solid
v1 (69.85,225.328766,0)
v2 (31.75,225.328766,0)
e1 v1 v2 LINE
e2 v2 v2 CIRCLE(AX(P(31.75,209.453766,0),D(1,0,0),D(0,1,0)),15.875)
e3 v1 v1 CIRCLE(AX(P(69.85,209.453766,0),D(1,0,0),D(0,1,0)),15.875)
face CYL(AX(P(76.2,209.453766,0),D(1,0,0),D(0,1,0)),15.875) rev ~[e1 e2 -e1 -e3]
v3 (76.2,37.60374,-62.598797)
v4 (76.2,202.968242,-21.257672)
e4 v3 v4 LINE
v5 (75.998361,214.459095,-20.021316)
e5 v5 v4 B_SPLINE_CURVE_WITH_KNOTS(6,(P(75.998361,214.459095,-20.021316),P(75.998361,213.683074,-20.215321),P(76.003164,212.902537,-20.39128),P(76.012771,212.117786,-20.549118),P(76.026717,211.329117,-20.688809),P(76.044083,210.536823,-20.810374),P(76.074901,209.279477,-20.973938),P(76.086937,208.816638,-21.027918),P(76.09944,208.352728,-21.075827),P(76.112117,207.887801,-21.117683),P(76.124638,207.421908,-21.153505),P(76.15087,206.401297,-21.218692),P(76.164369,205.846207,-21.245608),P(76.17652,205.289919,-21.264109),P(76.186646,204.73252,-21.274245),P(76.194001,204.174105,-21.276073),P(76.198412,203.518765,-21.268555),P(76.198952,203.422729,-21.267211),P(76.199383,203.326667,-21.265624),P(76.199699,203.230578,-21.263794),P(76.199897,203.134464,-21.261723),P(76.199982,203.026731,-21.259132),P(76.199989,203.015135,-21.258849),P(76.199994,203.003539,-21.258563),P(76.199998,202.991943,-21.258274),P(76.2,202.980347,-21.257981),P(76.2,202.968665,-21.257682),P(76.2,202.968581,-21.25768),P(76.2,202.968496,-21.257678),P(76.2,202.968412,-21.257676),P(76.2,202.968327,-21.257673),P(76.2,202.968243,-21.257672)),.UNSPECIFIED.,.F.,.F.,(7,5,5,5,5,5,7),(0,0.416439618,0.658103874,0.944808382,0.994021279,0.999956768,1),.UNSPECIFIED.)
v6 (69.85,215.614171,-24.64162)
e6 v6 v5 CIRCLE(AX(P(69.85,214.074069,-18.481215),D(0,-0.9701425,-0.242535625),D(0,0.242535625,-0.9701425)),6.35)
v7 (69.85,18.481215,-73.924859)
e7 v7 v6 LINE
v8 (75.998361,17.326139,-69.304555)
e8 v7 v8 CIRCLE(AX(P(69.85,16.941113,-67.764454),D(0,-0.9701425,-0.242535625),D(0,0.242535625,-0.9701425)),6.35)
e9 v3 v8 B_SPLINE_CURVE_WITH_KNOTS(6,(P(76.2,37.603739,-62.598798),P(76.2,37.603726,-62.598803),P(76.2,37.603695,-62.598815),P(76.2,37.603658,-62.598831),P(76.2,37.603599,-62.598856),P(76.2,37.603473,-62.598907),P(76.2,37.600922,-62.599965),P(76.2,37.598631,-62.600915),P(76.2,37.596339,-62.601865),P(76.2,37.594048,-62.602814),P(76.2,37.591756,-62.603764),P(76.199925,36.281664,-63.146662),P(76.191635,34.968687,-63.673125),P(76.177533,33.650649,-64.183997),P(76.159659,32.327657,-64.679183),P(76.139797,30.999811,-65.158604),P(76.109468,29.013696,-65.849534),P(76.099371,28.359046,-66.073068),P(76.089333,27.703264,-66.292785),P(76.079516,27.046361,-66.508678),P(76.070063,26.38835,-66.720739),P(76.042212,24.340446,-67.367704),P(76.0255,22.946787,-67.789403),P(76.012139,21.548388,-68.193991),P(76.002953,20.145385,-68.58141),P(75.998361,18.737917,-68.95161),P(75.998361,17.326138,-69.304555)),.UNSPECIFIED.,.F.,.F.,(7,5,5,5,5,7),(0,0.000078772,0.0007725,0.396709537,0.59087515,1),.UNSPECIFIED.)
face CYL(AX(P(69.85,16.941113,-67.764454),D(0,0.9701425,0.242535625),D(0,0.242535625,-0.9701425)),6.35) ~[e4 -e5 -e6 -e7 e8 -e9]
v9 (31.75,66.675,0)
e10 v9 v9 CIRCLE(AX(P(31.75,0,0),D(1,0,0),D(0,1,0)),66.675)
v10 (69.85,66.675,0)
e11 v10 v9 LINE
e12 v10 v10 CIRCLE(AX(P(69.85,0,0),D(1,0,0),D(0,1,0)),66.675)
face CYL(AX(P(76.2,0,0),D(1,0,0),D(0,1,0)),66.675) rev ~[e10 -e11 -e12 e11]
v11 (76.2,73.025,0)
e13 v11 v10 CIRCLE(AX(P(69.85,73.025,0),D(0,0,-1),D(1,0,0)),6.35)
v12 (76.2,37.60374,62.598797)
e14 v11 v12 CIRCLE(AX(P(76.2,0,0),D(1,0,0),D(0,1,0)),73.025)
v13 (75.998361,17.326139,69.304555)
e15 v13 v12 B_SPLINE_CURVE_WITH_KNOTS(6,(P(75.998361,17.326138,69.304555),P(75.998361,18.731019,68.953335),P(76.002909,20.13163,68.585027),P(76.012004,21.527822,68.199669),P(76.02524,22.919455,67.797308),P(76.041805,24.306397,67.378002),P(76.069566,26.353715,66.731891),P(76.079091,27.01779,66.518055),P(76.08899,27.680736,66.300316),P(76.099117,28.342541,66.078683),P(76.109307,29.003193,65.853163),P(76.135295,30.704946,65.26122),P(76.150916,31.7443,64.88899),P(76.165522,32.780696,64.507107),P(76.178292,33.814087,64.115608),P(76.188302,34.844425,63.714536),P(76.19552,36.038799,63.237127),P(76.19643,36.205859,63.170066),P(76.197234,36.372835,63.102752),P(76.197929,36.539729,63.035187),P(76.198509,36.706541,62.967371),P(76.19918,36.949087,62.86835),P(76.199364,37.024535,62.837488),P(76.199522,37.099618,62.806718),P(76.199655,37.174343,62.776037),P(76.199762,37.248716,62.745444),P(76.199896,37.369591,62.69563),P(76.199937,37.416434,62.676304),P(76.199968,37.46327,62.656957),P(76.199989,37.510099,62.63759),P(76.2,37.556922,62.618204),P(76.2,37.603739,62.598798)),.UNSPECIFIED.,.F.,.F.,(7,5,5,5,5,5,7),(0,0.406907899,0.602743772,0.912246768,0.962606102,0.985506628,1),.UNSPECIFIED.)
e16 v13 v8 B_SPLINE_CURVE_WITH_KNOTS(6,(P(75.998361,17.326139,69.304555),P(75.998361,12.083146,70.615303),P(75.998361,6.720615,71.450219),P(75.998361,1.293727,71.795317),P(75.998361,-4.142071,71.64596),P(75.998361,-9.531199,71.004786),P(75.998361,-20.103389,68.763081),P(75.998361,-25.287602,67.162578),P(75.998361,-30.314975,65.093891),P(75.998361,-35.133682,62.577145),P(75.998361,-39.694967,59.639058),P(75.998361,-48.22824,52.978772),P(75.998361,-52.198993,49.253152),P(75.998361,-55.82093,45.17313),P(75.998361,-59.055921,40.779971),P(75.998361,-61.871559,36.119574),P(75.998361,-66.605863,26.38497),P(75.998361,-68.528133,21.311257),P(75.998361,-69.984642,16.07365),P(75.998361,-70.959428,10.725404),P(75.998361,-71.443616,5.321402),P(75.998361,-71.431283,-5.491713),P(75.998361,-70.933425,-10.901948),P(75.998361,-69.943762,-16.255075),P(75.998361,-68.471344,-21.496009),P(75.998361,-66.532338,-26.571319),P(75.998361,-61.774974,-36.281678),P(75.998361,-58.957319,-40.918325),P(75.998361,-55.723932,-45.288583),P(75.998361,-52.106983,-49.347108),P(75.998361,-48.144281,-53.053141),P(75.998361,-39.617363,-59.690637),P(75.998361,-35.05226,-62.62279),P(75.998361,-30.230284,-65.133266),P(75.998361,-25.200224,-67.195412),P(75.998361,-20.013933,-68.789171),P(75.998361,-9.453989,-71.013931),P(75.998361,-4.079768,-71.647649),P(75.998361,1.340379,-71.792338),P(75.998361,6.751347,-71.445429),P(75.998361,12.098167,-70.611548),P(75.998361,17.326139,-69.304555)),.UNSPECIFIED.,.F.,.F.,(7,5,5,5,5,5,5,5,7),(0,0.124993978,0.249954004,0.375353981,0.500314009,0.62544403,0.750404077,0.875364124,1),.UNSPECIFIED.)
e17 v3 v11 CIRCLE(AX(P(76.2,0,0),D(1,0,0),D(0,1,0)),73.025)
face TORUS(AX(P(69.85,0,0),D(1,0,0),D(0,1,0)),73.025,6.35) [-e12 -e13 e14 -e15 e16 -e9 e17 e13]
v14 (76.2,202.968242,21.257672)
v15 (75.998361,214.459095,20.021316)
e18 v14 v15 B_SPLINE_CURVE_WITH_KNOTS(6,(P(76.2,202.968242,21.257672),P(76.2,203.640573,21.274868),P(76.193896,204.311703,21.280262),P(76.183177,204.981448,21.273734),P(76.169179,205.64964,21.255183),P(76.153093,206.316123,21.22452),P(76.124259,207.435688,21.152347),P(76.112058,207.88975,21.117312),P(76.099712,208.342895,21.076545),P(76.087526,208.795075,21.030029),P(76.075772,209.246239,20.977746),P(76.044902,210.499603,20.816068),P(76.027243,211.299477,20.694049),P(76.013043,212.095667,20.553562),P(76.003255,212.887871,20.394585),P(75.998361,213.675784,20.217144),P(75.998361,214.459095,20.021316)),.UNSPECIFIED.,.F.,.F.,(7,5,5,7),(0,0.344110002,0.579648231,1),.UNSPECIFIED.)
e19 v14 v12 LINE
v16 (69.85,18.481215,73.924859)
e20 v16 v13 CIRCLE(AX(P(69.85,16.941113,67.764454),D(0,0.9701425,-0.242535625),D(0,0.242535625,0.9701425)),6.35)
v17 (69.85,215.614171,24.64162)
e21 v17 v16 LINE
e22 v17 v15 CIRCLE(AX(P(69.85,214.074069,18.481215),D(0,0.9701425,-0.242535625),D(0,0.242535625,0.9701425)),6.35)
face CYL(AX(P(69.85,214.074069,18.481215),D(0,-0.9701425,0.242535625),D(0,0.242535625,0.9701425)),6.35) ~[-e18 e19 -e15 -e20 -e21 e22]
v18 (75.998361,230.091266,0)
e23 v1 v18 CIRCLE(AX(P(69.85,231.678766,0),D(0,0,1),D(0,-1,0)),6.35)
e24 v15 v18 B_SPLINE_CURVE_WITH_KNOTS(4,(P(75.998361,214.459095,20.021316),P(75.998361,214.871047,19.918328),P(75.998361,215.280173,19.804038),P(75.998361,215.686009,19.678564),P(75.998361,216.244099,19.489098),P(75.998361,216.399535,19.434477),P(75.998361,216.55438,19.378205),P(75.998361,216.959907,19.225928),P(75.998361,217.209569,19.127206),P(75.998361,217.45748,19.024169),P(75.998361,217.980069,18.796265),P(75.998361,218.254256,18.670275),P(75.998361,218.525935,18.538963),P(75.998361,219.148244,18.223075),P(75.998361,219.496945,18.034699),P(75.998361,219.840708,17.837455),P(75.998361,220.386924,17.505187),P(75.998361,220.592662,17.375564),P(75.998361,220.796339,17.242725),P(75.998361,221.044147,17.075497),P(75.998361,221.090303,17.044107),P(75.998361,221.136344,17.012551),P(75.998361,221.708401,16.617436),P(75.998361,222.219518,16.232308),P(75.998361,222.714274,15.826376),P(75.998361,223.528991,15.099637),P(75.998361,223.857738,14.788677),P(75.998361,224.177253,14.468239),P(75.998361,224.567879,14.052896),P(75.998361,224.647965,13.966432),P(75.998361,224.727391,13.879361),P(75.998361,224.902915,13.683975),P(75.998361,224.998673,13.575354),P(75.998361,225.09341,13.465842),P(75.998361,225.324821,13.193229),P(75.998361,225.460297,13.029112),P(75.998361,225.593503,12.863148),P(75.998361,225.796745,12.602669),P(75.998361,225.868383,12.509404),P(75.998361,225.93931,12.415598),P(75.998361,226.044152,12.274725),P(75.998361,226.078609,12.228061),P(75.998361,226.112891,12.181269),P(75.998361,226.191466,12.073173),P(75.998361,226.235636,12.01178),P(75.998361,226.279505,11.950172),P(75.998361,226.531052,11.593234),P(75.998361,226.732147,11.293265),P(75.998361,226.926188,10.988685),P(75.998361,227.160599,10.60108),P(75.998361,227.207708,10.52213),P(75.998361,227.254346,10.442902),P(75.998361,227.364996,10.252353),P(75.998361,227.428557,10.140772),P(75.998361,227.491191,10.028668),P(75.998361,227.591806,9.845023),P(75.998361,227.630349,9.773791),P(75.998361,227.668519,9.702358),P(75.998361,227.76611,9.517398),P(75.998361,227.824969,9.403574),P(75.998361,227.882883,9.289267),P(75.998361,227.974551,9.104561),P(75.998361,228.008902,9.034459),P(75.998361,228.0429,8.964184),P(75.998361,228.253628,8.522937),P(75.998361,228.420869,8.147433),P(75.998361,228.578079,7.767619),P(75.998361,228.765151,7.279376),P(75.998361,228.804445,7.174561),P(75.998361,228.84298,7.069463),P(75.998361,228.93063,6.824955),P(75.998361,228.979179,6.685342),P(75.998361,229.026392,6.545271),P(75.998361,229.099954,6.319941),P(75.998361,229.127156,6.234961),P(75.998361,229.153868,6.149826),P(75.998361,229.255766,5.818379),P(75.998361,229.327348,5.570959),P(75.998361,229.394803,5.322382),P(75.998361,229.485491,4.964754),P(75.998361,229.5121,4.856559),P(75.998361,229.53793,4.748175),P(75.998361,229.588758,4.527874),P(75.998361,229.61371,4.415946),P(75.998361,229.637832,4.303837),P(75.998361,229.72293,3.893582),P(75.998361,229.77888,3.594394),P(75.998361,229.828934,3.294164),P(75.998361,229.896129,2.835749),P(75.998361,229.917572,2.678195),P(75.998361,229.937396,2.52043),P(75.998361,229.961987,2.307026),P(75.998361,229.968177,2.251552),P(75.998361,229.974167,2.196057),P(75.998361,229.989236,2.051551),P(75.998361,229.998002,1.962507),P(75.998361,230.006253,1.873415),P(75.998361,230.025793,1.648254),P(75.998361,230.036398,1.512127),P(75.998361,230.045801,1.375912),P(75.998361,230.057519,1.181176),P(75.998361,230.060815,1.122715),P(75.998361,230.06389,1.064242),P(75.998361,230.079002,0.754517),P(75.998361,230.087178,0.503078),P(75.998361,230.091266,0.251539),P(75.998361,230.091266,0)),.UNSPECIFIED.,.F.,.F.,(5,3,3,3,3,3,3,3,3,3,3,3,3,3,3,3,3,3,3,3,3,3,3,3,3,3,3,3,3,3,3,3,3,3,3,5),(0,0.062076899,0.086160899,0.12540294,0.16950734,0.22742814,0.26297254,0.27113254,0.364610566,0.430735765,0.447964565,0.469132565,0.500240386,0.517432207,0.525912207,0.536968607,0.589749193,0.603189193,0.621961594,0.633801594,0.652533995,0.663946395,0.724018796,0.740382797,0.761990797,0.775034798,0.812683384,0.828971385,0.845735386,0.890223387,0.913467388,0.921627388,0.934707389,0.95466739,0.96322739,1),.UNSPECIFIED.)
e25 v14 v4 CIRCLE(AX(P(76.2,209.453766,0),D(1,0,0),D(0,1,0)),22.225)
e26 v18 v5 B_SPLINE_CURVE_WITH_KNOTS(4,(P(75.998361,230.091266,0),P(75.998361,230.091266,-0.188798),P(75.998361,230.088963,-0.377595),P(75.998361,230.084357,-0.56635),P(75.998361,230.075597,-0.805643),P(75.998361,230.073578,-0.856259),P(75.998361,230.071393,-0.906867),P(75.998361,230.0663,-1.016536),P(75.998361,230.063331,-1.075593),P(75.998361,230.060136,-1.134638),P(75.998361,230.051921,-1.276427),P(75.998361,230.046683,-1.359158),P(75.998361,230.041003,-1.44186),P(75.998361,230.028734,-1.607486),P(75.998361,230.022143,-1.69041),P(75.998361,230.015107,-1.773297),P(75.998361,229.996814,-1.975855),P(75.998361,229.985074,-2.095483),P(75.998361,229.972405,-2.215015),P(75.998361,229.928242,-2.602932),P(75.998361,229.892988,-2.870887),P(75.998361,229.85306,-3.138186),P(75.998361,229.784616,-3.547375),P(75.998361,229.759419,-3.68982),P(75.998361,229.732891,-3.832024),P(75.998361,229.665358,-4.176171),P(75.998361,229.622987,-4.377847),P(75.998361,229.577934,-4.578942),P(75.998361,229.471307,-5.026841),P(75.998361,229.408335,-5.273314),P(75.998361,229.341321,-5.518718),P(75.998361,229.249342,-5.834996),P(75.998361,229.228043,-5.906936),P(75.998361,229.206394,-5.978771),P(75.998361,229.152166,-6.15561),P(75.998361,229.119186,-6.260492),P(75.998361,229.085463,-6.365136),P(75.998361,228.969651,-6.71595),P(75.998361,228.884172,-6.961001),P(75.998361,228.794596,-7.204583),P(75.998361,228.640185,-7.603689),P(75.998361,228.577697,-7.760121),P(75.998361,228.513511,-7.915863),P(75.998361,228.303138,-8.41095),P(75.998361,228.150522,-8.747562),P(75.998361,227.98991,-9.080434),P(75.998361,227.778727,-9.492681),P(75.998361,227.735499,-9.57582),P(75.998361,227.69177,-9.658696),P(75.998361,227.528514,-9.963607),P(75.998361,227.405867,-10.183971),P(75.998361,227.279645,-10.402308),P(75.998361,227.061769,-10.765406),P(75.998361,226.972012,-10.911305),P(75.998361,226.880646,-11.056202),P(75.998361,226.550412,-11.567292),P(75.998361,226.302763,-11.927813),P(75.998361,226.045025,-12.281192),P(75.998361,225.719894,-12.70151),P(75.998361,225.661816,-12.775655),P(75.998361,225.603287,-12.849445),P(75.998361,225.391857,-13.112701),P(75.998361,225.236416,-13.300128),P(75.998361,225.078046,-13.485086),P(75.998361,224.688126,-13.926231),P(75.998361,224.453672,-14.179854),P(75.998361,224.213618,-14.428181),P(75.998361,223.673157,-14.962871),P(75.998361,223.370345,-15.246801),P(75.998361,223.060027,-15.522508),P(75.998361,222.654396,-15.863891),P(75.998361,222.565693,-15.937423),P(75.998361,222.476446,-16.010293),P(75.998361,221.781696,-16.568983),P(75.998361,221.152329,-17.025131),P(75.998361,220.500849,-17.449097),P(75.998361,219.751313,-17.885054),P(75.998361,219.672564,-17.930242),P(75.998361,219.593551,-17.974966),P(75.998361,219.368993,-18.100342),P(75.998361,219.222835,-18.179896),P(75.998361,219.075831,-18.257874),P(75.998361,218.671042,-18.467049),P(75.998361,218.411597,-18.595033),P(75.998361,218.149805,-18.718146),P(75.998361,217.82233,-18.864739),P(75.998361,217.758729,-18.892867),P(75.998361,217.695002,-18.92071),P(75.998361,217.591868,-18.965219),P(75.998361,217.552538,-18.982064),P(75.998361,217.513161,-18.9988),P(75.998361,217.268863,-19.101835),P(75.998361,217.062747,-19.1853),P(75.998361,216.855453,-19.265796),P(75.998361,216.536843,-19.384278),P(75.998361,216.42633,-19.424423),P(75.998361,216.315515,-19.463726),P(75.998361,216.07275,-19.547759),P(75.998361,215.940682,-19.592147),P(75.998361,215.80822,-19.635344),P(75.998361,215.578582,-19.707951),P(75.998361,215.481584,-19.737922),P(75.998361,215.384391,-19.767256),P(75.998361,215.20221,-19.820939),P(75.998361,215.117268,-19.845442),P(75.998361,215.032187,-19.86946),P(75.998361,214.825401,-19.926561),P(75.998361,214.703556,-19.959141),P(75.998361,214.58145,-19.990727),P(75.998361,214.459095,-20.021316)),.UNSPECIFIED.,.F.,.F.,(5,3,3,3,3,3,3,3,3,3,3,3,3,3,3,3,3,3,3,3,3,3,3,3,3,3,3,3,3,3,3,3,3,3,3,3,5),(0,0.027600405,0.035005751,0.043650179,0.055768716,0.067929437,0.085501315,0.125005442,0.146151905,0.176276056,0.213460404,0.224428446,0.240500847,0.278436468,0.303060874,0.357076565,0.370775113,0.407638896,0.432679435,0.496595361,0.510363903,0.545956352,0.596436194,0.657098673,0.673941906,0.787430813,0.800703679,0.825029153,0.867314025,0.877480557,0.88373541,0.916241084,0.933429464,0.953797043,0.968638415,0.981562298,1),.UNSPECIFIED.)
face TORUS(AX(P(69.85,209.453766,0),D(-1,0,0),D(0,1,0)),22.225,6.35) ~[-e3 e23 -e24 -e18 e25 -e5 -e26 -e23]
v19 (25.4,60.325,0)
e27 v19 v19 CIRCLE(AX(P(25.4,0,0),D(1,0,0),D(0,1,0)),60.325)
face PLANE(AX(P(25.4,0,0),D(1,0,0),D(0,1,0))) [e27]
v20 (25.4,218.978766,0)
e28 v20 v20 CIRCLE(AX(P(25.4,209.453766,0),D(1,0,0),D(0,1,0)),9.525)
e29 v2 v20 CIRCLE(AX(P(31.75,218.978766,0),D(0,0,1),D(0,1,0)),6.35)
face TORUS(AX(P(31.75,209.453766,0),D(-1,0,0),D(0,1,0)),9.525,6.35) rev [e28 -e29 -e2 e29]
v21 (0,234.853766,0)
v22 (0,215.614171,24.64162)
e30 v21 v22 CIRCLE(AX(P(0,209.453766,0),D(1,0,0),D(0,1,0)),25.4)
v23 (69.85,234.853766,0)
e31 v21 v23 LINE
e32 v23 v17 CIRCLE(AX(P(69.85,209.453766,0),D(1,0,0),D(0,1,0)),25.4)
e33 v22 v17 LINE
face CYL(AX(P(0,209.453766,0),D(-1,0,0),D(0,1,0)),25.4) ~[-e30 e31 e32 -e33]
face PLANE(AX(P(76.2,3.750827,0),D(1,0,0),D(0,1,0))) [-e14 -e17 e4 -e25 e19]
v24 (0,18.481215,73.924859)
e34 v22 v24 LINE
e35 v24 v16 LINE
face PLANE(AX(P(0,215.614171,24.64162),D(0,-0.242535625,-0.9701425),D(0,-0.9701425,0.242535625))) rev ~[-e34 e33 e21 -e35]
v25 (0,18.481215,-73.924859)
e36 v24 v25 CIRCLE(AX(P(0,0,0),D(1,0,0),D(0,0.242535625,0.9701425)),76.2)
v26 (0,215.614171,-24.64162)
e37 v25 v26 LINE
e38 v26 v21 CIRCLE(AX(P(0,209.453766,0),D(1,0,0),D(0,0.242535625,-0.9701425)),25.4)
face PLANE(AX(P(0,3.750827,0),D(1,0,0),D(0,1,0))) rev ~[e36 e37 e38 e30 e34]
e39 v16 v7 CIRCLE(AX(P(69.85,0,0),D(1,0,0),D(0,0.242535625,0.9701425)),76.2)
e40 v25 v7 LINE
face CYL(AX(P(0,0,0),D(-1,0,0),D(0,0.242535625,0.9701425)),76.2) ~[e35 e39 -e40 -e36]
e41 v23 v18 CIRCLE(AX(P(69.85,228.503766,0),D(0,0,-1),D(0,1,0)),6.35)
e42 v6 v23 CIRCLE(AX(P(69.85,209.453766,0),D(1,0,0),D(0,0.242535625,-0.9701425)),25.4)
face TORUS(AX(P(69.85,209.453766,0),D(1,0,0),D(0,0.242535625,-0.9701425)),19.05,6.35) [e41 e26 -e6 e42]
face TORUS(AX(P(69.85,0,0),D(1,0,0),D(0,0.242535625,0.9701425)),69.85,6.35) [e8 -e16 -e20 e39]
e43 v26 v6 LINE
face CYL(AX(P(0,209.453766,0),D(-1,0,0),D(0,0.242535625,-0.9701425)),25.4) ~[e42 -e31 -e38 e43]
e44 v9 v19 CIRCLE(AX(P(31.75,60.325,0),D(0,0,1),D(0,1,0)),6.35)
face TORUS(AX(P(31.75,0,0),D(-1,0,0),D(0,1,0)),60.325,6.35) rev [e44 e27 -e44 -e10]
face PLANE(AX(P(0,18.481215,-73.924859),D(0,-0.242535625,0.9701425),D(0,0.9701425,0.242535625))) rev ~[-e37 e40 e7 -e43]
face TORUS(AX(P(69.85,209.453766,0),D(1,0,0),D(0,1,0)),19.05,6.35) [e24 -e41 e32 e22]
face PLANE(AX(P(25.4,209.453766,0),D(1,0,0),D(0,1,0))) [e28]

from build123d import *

# Parameters (mm, degrees)
F1_DEPTH = 76.2
F2_R     = 66.675
F2_R_2   = 15.875
F3_DEPTH = 50.8
F4_F1_R  = 6.35
F4_F2_R  = 6.35
F4_F3_R  = 6.35


# Not quite as in the source:
# - a fillet or chamfer that OpenCascade refuses, or shapes differently, is made with other operations: its cross-section is extruded or revolved along the edge and cut away or added


with BuildPart() as f1:
    # F0 (on Right) → F1 (new body)
    with BuildSketch(Plane.YZ):
        with BuildLine():
            ThreePointArc((18.4812146278, -73.9248585111), (60.0612543768, -46.8944103565), (76.2, 0))
            ThreePointArc((76.2, 0), (60.0612543768, 46.8944103565), (18.4812146278, 73.9248585111))
            ThreePointArc((18.4812146278, 73.9248585111), (-76.2, 0), (18.4812146278, -73.9248585111))
        make_face()
        with BuildLine():
            ThreePointArc((18.4812146278, 73.9248585111), (60.0612543768, 46.8944103565), (76.2, 0))
            ThreePointArc((76.2, 0), (60.0612543768, -46.8944103565), (18.4812146278, -73.9248585111))
            Line((18.4812146278, -73.9248585111), (215.6141706573, -24.6416195037))
            ThreePointArc((215.6141706573, -24.6416195037), (184.0537657814, 0), (215.6141706573, 24.6416195037))
            Line((215.6141706573, 24.6416195037), (18.4812146278, 73.9248585111))
        make_face()
        with BuildLine():
            ThreePointArc((234.8537657814, 0), (229.474183907, 15.6314701188), (215.6141706573, 24.6416195037))
            ThreePointArc((215.6141706573, 24.6416195037), (184.0537657814, 0), (215.6141706573, -24.6416195037))
            ThreePointArc((215.6141706573, -24.6416195037), (229.474183907, -15.6314701188), (234.8537657814, 0))
        make_face()
    extrude(amount=F1_DEPTH)

    # F2 (on face) → F3 (cut)
    with BuildSketch(Plane.YZ.offset(76.2)):
        Circle(F2_R)
        with Locations((209.4537657814, 0)):
            Circle(F2_R_2)
    extrude(amount=-F3_DEPTH, mode=Mode.SUBTRACT)

    # F4: fillet of radius 6.35 on 8 edges, made by hand

    # F4_f1
    f4_f1_edges = [f1.edges().sort_by_distance(p)[0] for p in [
        (76.2, -76.2, 0),
        (76.2, 117.0476926425, 49.2832390074),
        (76.2, 117.0476926425, -49.2832390074),
        (76.2, 234.8537657814, 0),
    ]]
    fillet(f4_f1_edges, radius=F4_F1_R)

    # F4_f2
    f4_f2_edges = [f1.edges().sort_by_distance(p)[0] for p in [
        (25.4, -66.675, 0),
    ]]
    fillet(f4_f2_edges, radius=F4_F2_R)

    # F4_f3
    f4_f3_edges = [f1.edges().sort_by_distance(p)[0] for p in [
        (25.4, 193.5787657814, 0),
    ]]
    fillet(f4_f3_edges, radius=F4_F3_R)

    # F4_s4 → F4_t5 (revolve, cut)
    with BuildSketch(Plane.XY):
        with BuildLine():
            ThreePointArc((76.2, 73.025), (74.3401280605, 68.5348719395), (69.85, 66.675))
            Line((69.85, 66.675), (69.85, 66.548))
            Line((69.85, 66.548), (76.327, 66.548))
            Line((76.327, 66.548), (76.327, 73.025))
            Line((76.327, 73.025), (76.2, 73.025))
        make_face()
    revolve(axis=Axis((76.2, 0, 0), (1, 0, 0)), mode=Mode.SUBTRACT)

    # F4_s6 → F4_t7 (revolve, cut)
    with BuildSketch(Plane.XY):
        with BuildLine():
            ThreePointArc((69.85, 225.3287657814), (74.3401280605, 227.1886377208), (76.2, 231.6787657814))
            Line((76.2, 231.6787657814), (76.327, 231.6787657814))
            Line((76.327, 231.6787657814), (76.327, 225.2017657814))
            Line((76.327, 225.2017657814), (69.85, 225.2017657814))
            Line((69.85, 225.2017657814), (69.85, 225.3287657814))
        make_face()
    revolve(axis=Axis((76.2, 209.4537657814, 0), (1, 0, 0)), mode=Mode.SUBTRACT)


solid = f1.part
